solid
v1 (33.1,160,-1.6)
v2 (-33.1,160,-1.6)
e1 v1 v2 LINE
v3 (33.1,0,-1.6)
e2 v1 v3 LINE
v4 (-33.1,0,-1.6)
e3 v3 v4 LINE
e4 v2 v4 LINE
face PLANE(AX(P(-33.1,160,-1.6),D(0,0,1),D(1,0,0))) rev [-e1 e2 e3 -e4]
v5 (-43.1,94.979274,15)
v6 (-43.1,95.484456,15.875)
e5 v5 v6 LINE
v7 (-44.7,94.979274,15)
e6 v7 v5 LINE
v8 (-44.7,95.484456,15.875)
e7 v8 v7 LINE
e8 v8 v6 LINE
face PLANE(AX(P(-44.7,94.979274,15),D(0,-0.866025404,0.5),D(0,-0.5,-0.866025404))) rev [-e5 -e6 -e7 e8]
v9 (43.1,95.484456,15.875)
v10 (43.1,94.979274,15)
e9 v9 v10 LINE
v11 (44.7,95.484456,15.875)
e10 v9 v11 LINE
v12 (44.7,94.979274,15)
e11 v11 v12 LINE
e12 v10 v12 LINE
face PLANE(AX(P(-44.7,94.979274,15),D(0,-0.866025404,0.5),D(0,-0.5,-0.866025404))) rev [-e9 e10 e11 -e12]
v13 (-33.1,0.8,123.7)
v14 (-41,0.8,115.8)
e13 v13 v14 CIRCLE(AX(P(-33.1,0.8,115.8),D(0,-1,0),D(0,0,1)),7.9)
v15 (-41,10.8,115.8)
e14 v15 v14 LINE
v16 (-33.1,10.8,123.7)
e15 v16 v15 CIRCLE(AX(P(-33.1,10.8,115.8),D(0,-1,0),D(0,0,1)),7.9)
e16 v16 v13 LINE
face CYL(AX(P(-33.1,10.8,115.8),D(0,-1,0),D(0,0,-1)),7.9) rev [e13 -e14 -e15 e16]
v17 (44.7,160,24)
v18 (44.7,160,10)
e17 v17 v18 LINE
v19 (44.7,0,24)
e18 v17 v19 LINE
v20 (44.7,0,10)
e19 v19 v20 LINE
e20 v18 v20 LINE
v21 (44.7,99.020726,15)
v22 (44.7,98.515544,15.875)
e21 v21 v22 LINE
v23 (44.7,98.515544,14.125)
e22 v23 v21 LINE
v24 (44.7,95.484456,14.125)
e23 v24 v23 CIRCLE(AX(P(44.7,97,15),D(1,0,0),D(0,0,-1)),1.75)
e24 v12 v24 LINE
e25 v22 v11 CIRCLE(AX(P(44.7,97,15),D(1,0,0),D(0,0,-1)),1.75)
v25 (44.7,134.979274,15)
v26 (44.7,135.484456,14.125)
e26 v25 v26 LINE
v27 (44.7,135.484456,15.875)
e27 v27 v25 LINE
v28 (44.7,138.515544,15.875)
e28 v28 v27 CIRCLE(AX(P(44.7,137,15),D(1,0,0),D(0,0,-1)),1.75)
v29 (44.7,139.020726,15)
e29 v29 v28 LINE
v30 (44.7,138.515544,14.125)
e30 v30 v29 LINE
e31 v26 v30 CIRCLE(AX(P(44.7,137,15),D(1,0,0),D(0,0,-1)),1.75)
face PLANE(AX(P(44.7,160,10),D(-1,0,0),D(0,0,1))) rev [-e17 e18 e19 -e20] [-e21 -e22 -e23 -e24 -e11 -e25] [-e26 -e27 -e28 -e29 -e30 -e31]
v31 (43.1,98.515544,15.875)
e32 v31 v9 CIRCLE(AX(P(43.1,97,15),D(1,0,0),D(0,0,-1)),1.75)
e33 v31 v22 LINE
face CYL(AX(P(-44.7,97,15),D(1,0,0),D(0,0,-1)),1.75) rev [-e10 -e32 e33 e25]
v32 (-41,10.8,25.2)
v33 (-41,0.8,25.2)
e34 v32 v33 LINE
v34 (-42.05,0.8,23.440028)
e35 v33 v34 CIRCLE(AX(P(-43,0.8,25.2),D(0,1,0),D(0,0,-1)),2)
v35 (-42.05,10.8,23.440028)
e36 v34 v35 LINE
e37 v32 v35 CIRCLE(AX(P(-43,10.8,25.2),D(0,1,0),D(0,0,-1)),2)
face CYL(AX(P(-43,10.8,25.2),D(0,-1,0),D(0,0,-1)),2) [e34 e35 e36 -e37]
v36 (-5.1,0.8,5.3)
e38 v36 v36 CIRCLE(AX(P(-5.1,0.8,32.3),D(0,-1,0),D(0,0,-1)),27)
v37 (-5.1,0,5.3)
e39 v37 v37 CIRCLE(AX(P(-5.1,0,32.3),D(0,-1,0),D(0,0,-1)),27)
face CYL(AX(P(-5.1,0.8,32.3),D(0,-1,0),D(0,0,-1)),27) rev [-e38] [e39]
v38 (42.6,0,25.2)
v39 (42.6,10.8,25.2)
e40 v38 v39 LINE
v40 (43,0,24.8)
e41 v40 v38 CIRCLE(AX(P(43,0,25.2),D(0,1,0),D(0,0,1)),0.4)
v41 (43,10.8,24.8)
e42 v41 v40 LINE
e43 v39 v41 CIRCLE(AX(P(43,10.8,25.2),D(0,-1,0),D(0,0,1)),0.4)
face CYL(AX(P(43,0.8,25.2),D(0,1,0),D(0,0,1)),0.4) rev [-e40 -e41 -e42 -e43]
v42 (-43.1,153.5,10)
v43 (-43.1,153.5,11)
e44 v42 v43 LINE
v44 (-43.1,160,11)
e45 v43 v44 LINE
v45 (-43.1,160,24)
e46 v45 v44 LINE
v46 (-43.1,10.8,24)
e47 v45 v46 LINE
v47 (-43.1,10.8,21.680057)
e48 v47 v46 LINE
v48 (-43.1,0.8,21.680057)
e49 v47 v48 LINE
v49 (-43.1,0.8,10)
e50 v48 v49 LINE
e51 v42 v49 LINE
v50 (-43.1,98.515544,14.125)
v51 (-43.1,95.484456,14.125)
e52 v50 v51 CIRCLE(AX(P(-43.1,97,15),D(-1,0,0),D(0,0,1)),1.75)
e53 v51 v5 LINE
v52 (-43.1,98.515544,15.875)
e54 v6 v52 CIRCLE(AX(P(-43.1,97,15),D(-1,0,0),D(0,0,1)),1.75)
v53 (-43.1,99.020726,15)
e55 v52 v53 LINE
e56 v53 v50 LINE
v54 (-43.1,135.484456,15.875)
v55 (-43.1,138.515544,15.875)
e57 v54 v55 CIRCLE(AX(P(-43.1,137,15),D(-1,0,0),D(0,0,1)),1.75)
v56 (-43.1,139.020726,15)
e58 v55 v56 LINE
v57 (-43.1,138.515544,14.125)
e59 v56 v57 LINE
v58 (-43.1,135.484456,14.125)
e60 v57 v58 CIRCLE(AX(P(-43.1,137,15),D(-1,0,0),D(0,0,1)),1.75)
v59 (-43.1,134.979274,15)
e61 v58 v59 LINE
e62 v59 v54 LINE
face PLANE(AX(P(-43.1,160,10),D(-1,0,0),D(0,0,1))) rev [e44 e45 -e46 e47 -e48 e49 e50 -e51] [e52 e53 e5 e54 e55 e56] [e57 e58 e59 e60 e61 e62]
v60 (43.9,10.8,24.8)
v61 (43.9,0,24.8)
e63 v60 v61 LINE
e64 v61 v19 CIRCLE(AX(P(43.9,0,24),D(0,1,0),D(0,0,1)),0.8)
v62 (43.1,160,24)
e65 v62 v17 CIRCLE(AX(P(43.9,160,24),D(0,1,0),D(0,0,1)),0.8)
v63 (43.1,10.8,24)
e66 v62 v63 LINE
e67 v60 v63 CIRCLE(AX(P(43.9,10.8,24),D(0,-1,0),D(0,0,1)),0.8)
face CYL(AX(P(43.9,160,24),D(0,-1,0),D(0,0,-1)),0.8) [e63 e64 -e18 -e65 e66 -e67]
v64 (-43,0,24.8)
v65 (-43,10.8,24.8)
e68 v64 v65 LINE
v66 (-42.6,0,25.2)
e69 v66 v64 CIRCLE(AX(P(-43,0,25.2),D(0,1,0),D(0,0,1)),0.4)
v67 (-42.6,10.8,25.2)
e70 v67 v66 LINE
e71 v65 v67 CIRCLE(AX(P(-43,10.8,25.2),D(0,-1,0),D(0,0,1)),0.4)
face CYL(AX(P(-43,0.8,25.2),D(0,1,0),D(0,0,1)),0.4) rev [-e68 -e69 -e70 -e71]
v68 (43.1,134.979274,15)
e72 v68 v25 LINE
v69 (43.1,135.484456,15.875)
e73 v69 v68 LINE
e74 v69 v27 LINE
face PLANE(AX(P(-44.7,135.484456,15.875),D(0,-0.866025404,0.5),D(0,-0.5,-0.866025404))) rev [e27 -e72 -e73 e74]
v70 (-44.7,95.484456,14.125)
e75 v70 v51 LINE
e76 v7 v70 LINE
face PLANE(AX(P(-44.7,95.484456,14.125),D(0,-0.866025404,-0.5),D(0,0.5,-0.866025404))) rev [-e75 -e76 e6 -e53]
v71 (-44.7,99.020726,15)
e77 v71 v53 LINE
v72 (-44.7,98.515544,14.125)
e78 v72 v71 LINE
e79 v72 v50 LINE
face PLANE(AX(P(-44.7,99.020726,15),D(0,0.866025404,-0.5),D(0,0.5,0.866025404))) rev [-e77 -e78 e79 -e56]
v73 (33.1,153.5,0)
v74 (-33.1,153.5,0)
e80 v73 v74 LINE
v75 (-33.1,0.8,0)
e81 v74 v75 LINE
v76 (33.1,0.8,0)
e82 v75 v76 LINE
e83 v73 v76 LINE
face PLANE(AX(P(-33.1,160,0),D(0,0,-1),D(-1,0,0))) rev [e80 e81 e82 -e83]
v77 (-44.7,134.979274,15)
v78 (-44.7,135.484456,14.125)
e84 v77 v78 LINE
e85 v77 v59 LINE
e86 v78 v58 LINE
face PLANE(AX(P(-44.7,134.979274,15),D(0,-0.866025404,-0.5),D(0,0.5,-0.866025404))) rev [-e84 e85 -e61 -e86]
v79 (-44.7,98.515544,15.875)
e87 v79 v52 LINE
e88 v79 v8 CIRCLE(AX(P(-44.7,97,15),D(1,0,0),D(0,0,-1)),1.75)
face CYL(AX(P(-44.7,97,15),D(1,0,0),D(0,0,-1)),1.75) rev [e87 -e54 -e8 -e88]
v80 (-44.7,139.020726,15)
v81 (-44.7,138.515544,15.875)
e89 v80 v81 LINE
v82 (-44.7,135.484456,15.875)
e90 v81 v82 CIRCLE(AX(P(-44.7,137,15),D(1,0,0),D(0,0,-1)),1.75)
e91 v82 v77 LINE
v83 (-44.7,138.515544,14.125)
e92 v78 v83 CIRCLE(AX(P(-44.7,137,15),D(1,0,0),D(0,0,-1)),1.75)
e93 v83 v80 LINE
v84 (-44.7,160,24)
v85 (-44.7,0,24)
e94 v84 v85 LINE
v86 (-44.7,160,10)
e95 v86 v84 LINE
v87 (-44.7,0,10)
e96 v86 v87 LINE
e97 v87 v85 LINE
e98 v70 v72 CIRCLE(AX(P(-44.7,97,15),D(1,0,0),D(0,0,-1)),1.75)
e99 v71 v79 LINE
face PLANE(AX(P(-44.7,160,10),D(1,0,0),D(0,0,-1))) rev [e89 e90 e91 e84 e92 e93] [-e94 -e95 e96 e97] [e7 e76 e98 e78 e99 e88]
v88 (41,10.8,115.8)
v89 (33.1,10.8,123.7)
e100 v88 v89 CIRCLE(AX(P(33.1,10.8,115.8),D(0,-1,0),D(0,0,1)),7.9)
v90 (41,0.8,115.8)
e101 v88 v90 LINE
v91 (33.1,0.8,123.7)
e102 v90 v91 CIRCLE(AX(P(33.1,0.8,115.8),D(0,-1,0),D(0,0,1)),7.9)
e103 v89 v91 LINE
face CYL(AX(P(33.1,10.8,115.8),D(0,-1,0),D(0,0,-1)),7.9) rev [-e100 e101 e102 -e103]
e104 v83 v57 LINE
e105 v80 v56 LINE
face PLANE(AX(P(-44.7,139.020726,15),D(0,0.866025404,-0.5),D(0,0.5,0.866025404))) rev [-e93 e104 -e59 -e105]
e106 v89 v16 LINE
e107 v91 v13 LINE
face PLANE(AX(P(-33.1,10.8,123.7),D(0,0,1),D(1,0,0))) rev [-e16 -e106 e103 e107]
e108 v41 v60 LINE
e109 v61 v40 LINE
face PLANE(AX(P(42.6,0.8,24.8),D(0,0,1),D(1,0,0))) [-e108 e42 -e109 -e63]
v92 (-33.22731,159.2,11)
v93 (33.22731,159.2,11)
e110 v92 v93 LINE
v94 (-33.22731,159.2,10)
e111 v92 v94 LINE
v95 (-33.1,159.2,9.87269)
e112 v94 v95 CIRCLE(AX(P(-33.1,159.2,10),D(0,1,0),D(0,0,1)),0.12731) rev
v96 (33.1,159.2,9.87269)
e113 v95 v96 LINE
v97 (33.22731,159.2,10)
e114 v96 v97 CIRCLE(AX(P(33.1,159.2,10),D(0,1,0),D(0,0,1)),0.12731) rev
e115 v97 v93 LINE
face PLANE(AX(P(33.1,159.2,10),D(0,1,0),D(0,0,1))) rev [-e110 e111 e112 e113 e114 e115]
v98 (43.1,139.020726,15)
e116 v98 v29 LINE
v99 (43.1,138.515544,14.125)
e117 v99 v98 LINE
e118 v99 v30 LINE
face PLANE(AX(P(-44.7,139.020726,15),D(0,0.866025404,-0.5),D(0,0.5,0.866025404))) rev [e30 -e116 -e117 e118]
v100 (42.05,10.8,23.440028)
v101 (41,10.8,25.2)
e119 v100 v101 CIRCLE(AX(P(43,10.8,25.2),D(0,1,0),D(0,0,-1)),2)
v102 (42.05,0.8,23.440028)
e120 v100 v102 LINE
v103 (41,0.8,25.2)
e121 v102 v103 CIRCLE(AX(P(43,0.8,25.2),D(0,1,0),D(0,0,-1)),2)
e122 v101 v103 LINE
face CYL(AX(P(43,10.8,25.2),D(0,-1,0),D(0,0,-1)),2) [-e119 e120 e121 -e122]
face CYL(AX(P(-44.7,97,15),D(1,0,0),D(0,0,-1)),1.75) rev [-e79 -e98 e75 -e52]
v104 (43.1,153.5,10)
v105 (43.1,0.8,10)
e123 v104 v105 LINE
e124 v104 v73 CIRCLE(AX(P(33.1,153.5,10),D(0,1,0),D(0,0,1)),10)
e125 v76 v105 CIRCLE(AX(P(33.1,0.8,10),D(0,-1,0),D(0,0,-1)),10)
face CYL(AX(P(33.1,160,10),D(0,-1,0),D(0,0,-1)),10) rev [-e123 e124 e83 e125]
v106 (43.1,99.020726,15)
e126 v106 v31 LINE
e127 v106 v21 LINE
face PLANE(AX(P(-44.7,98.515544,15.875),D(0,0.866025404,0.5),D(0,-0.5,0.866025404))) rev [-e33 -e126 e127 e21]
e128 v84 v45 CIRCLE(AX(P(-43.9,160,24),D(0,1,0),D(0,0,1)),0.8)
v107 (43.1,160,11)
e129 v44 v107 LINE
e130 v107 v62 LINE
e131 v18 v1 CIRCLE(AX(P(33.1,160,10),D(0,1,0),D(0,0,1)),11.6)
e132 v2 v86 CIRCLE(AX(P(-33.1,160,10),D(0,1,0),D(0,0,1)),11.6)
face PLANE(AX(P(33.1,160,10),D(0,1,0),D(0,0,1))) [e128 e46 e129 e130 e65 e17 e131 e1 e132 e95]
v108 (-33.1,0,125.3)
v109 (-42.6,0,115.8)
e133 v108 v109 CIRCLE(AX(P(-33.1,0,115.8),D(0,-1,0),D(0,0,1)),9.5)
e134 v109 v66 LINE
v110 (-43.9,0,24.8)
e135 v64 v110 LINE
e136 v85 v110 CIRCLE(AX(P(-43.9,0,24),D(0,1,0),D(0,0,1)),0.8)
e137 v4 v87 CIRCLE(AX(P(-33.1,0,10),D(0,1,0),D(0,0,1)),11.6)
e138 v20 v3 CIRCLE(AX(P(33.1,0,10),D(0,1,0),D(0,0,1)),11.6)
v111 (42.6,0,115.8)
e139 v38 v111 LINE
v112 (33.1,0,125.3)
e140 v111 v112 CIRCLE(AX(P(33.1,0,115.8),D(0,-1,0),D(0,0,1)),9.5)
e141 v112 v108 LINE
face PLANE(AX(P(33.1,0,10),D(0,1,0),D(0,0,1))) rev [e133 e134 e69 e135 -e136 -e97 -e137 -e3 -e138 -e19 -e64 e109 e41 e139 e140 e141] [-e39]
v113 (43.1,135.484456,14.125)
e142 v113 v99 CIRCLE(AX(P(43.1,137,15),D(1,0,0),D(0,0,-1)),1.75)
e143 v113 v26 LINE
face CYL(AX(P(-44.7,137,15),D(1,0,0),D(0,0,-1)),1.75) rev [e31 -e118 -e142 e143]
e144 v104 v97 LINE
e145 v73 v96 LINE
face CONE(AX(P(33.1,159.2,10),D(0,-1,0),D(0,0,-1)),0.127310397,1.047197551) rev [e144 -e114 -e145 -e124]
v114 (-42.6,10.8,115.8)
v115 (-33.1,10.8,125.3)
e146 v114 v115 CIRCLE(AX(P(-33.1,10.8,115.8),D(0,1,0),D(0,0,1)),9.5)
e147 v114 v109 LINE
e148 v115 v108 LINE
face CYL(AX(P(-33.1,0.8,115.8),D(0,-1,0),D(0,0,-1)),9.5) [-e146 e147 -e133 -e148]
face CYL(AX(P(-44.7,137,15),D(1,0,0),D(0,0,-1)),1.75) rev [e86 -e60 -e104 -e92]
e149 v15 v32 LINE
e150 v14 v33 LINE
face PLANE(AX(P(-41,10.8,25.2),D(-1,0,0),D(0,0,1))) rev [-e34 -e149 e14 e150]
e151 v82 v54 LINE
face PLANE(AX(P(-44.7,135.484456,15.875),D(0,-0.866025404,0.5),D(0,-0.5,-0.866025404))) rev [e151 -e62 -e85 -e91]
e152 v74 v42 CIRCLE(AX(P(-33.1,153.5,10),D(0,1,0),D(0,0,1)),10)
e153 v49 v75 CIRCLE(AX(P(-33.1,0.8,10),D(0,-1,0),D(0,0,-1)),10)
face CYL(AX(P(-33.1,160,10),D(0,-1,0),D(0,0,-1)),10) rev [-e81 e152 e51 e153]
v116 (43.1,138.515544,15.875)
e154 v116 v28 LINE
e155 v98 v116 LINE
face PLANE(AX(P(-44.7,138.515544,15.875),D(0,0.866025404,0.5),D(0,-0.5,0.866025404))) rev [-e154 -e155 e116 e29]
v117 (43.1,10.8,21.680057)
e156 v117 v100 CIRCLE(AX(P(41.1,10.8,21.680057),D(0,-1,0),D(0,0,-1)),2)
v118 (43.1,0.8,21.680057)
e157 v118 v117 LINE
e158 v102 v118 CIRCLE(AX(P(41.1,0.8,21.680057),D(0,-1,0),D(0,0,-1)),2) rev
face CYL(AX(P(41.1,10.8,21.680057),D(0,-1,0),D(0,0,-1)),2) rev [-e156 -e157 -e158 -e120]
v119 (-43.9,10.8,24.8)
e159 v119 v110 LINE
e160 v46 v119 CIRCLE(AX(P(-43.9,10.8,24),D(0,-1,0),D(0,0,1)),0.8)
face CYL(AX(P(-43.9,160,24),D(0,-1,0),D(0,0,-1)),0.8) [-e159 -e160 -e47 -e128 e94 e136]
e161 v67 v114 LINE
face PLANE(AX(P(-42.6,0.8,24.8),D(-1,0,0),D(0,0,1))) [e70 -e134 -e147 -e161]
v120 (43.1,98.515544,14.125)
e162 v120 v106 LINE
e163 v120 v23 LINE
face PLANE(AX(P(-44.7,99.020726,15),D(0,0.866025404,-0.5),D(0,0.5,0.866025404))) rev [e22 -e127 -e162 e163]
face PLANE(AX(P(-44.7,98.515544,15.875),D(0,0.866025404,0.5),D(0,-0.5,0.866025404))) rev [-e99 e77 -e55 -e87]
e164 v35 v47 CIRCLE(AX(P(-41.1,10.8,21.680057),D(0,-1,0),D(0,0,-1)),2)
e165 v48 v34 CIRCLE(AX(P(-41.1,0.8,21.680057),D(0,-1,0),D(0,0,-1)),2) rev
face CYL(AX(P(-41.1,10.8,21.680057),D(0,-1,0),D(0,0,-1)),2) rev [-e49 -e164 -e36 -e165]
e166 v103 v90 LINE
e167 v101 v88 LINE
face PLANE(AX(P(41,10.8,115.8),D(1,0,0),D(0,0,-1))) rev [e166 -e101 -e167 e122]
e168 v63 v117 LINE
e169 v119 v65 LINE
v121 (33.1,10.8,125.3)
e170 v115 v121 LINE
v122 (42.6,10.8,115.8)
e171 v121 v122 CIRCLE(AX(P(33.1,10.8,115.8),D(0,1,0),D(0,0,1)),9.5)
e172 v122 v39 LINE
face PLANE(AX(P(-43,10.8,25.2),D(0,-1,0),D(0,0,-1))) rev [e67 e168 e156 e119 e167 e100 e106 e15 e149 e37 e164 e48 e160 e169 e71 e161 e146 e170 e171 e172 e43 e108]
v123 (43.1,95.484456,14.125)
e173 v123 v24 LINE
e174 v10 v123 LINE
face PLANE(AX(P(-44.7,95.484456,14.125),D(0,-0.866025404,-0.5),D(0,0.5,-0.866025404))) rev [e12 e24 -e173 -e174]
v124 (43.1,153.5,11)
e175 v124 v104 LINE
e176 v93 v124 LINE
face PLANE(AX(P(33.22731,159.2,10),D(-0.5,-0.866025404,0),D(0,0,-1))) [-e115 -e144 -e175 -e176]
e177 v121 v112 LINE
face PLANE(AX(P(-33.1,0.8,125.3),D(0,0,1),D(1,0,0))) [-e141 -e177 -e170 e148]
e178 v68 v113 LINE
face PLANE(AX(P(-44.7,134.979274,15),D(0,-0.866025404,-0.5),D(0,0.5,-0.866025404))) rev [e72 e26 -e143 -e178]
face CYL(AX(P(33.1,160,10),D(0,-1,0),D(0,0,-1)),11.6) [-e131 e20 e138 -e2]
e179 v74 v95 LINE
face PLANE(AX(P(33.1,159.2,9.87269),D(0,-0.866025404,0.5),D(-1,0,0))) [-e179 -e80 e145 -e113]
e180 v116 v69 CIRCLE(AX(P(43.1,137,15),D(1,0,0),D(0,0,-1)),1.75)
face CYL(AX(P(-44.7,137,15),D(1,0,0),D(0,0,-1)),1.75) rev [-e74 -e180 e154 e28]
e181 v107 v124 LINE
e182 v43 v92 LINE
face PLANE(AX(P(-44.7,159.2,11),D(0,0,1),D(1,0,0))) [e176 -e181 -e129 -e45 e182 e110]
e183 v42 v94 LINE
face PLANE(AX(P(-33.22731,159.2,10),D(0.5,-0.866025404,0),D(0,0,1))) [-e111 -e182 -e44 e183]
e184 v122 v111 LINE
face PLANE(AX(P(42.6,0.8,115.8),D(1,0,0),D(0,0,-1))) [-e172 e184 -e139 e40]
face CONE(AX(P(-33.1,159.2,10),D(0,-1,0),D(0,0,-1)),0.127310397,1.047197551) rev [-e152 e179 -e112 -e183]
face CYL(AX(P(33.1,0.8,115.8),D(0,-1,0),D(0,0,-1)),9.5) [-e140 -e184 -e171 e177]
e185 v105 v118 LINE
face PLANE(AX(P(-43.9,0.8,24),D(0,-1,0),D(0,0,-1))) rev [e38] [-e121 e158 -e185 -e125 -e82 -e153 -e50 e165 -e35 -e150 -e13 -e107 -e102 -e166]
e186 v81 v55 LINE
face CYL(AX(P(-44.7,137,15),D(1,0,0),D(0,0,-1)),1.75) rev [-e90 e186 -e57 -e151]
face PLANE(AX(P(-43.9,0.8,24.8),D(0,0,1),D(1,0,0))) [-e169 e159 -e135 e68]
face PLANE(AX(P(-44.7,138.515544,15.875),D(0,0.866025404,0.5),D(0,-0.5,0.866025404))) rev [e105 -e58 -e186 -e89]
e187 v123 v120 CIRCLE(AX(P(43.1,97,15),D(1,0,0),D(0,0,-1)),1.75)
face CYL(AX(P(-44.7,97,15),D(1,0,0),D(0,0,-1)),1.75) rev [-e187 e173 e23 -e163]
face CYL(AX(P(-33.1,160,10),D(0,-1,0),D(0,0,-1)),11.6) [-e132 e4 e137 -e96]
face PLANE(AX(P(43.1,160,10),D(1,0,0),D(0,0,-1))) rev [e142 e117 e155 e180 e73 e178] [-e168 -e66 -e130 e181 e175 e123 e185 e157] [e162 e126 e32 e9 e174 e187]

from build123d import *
from OCP.BRepFilletAPI import BRepFilletAPI_MakeChamfer

# Parameters (mm, degrees)
BOSS_EXTRUDE1_DEPTH = 160
BOSS_EXTRUDE2_START = -0.8
BOSS_EXTRUDE2_DEPTH = 0.8
CUT_EXTRUDE1_DEPTH  = 185.952426316
SKETCH4_R           = 27
BOSS_EXTRUDE3_DEPTH = 0.8
FILLET1_R           = 0.4
BOSS_EXTRUDE4_DEPTH = 10
FILLET2_R           = 2
CHAMFER1_SIZE       = 5.7
CHAMFER1_SIZE2      = 9.872689603


with BuildPart() as part:
    # Sketch1 → Boss-Extrude1 (new body)
    with BuildSketch(Plane(origin=(0, 0, 0), x_dir=(1, 0, 0), z_dir=(0, 1, 0))):
        with BuildLine():
            Line((-33.1, 0), (33.1, 0))
            ThreePointArc((33.1, 0), (40.171067812, -2.928932188), (43.1, -10))
            Line((43.1, -10), (43.1, -24))
            ThreePointArc((43.1, -24), (43.9, -24.8), (44.7, -24))
            Line((44.7, -24), (44.7, -10))
            ThreePointArc((44.7, -10), (41.302438662, -1.797561338), (33.1, 1.6))
            Line((33.1, 1.6), (-33.1, 1.6))
            ThreePointArc((-33.1, 1.6), (-41.302438662, -1.797561338), (-44.7, -10))
            Line((-44.7, -10), (-44.7, -24))
            ThreePointArc((-44.7, -24), (-43.9, -24.8), (-43.1, -24))
            Line((-43.1, -24), (-43.1, -10))
            ThreePointArc((-43.1, -10), (-40.171067812, -2.928932188), (-33.1, 0))
        make_face()
    extrude(amount=BOSS_EXTRUDE1_DEPTH)

    # Sketch2 → Boss-Extrude2 (add)
    with BuildSketch(Plane(origin=(0, 160, 0), x_dir=(1, 0, 0), z_dir=(0, 1, 0)).offset(BOSS_EXTRUDE2_START)):
        with BuildLine():
            Line((44.7, -10), (44.7, -11))
            Line((44.7, -11), (-44.7, -11))
            Line((-44.7, -11), (-44.7, -10))
            ThreePointArc((-44.7, -10), (-41.302438662, -1.797561338), (-33.1, 1.6))
            Line((-33.1, 1.6), (33.1, 1.6))
            ThreePointArc((33.1, 1.6), (41.302438662, -1.797561338), (44.7, -10))
        make_face()
    extrude(amount=BOSS_EXTRUDE2_DEPTH)

    # Sketch3 → Cut-Extrude1 (cut, through all)
    with BuildSketch(Plane(origin=(44.7, 0, 0), x_dir=(0, 0, -1), z_dir=(1, 0, 0))):
        with BuildLine():
            Line((-15.875, 138.515544457), (-15, 139.020725942))
            Line((-15, 139.020725942), (-14.125, 138.515544457))
            ThreePointArc((-14.125, 138.515544457), (-13.25, 137), (-14.125, 135.484455543))
            Line((-14.125, 135.484455543), (-15, 134.979274058))
            Line((-15, 134.979274058), (-15.875, 135.484455543))
            ThreePointArc((-15.875, 135.484455543), (-16.75, 137), (-15.875, 138.515544457))
        make_face()
        with BuildLine():
            Line((-15.875, 98.515544457), (-15, 99.020725942))
            Line((-15, 99.020725942), (-14.125, 98.515544457))
            ThreePointArc((-14.125, 98.515544457), (-13.25, 97), (-14.125, 95.484455543))
            Line((-14.125, 95.484455543), (-15, 94.979274058))
            Line((-15, 94.979274058), (-15.875, 95.484455543))
            ThreePointArc((-15.875, 95.484455543), (-16.75, 97), (-15.875, 98.515544457))
        make_face()
    extrude(amount=-CUT_EXTRUDE1_DEPTH, mode=Mode.SUBTRACT)

    # Sketch4 → Boss-Extrude3 (add)
    with BuildSketch(Plane.XZ):
        with BuildLine():
            Line((-43.9, 24.8), (-42.6, 24.8))
            Line((-42.6, 24.8), (-42.6, 115.8))
            ThreePointArc((-42.6, 115.8), (-39.817514421, 122.517514421), (-33.1, 125.3))
            Line((-33.1, 125.3), (33.1, 125.3))
            ThreePointArc((33.1, 125.3), (39.817514421, 122.517514421), (42.6, 115.8))
            Line((42.6, 115.8), (42.6, 24.8))
            Line((42.6, 24.8), (43.9, 24.8))
            ThreePointArc((43.9, 24.8), (43.334314575, 24.565685425), (43.1, 24))
            Line((43.1, 24), (43.1, 10))
            ThreePointArc((43.1, 10), (40.171067812, 2.928932188), (33.1, 0))
            Line((33.1, 0), (-33.1, 0))
            ThreePointArc((-33.1, 0), (-40.171067812, 2.928932188), (-43.1, 10))
            Line((-43.1, 10), (-43.1, 24))
            ThreePointArc((-43.1, 24), (-43.334314575, 24.565685425), (-43.9, 24.8))
        make_face()
        with Locations(Location((-5.1, 32.3, 0), (0, 0, 270))):
            Circle(SKETCH4_R, mode=Mode.SUBTRACT)
    extrude(amount=-BOSS_EXTRUDE3_DEPTH)

    # Fillet1
    fillet1_edges = [part.edges().sort_by_distance(p)[0] for p in [
        (-42.6, 0.4, 24.8),
        (42.6, 0.4, 24.8),
    ]]
    fillet(fillet1_edges, radius=FILLET1_R)

    # Sketch6 → Boss-Extrude4 (add)
    with BuildSketch(Plane(origin=(0, 0.8, 0), x_dir=(1, 0, 0), z_dir=(0, 1, 0))):
        with BuildLine():
            Line((-43.1, -23.2), (-43, -23.2))
            ThreePointArc((-43, -23.2), (-41.585786438, -23.785786438), (-41, -25.2))
            Line((-41, -25.2), (-41, -115.8))
            ThreePointArc((-41, -115.8), (-38.686143571, -121.386143571), (-33.1, -123.7))
            Line((-33.1, -123.7), (33.1, -123.7))
            ThreePointArc((33.1, -123.7), (38.686143571, -121.386143571), (41, -115.8))
            Line((41, -115.8), (41, -25.2))
            ThreePointArc((41, -25.2), (41.585786438, -23.785786438), (43, -23.2))
            Line((43, -23.2), (43.1, -23.2))
            Line((43.1, -23.2), (43.1, -24))
            ThreePointArc((43.1, -24), (43.334314575, -24.565685425), (43.9, -24.8))
            Line((43.9, -24.8), (43, -24.8))
            ThreePointArc((43, -24.8), (42.717157288, -24.917157288), (42.6, -25.2))
            Line((42.6, -25.2), (42.6, -115.8))
            ThreePointArc((42.6, -115.8), (39.817514421, -122.517514421), (33.1, -125.3))
            Line((33.1, -125.3), (-33.1, -125.3))
            ThreePointArc((-33.1, -125.3), (-39.817514421, -122.517514421), (-42.6, -115.8))
            Line((-42.6, -115.8), (-42.6, -25.2))
            ThreePointArc((-42.6, -25.2), (-42.717157288, -24.917157288), (-43, -24.8))
            Line((-43, -24.8), (-43.9, -24.8))
            ThreePointArc((-43.9, -24.8), (-43.334314575, -24.565685425), (-43.1, -24))
            Line((-43.1, -24), (-43.1, -23.2))
        make_face()
    extrude(amount=BOSS_EXTRUDE4_DEPTH)

    # Fillet2
    # the kernel refuses this fillet: 2 mm, written as the material it adds along each edge
    with BuildSketch(Plane(origin=(43.1, 0.8, 23.2), x_dir=(-0.9748527767632401, 0, 0.22284986793130537), z_dir=(0, 1, 0))) as fillet2_piece_1:
        with BuildLine():
            CenterArc((1.610986416, -1.927420567), FILLET2_R, 105.482875224, 61.640649972)
            Line((-0.338719137, -1.481720831), (-0.533689693, -1.437150857))
            Line((-0.533689693, -1.437150857), (-0.194970555, 0.044569974))
            Line((-0.194970555, 0.044569974), (0.044569974, 0.194970555))
            ThreePointArc((0.044569974, 0.194970555), (0.142055251, 0.172685569), (1.023695645, 0.192742057))
            Line((1.023695645, 0.192742057), (1.077085715, 0))
        make_face()
    extrude(amount=10)
    with BuildSketch(Plane(origin=(-43.1, 0.8, 23.2), x_dir=(0.9748527767632457, 0, 0.2228498679312814), z_dir=(0, 1, 0))) as fillet2_piece_2:
        with BuildLine():
            CenterArc((1.610986416, 1.927420567), FILLET2_R, 192.876474804, 61.640649972)
            Line((-0.338719137, 1.481720831), (-0.533689693, 1.437150857))
            Line((-0.533689693, 1.437150857), (-0.194970555, -0.044569974))
            Line((-0.194970555, -0.044569974), (0.044569974, -0.194970555))
            ThreePointArc((0.044569974, -0.194970555), (0.142055251, -0.172685569), (1.023695645, -0.192742057))
            Line((1.023695645, -0.192742057), (1.077085715, 0))
        make_face()
    extrude(amount=10)

    # Chamfer1: one chamfer whose edges measure the first distance from different faces: ONE call of the kernel's chamfer builder (chamfer() names one face for all edges)
    chamfer1_edges_1 = [part.edges().sort_by_distance(p)[0] for p in [
        (0, 159.2, 0),
    ]]
    chamfer1_side_1 = [part.faces().sort_by_distance(p)[0] for p in [
        (0, 80, 0),
    ]]
    chamfer1_edges_2 = [part.edges().sort_by_distance(p)[0] for p in [
        (40.171067812, 159.2, 2.928932188),
    ]]
    chamfer1_side_2 = [part.faces().sort_by_distance(p)[0] for p in [
        (40.171067812, 80, 2.928932188),
    ]]
    chamfer1_edges_3 = [part.edges().sort_by_distance(p)[0] for p in [
        (43.1, 159.2, 10.5),
    ]]
    chamfer1_side_3 = [part.faces().sort_by_distance(p)[0] for p in [
        (43.1, 80.829745828, 16.958586697),
    ]]
    chamfer1_edges_4 = [part.edges().sort_by_distance(p)[0] for p in [
        (-43.1, 159.2, 10.5),
    ]]
    chamfer1_side_4 = [part.faces().sort_by_distance(p)[0] for p in [
        (-43.1, 80.829745828, 16.958586697),
    ]]
    chamfer1_edges_5 = [part.edges().sort_by_distance(p)[0] for p in [
        (-40.171067812, 159.2, 2.928932188),
    ]]
    chamfer1_side_5 = [part.faces().sort_by_distance(p)[0] for p in [
        (-40.171067812, 80, 2.928932188),
    ]]
    chamfer1 = BRepFilletAPI_MakeChamfer(part.part.solid().wrapped)
    for e in chamfer1_edges_1:
        chamfer1.Add(CHAMFER1_SIZE, CHAMFER1_SIZE2, e.wrapped, chamfer1_side_1[0].wrapped)  # the first distance lies on this face
    for e in chamfer1_edges_2:
        chamfer1.Add(CHAMFER1_SIZE, CHAMFER1_SIZE2, e.wrapped, chamfer1_side_2[0].wrapped)  # the first distance lies on this face
    for e in chamfer1_edges_3:
        chamfer1.Add(CHAMFER1_SIZE, CHAMFER1_SIZE2, e.wrapped, chamfer1_side_3[0].wrapped)  # the first distance lies on this face
    for e in chamfer1_edges_4:
        chamfer1.Add(CHAMFER1_SIZE, CHAMFER1_SIZE2, e.wrapped, chamfer1_side_4[0].wrapped)  # the first distance lies on this face
    for e in chamfer1_edges_5:
        chamfer1.Add(CHAMFER1_SIZE, CHAMFER1_SIZE2, e.wrapped, chamfer1_side_5[0].wrapped)  # the first distance lies on this face
    add(Compound.cast(chamfer1.Shape()), mode=Mode.REPLACE)


solid = part.part
